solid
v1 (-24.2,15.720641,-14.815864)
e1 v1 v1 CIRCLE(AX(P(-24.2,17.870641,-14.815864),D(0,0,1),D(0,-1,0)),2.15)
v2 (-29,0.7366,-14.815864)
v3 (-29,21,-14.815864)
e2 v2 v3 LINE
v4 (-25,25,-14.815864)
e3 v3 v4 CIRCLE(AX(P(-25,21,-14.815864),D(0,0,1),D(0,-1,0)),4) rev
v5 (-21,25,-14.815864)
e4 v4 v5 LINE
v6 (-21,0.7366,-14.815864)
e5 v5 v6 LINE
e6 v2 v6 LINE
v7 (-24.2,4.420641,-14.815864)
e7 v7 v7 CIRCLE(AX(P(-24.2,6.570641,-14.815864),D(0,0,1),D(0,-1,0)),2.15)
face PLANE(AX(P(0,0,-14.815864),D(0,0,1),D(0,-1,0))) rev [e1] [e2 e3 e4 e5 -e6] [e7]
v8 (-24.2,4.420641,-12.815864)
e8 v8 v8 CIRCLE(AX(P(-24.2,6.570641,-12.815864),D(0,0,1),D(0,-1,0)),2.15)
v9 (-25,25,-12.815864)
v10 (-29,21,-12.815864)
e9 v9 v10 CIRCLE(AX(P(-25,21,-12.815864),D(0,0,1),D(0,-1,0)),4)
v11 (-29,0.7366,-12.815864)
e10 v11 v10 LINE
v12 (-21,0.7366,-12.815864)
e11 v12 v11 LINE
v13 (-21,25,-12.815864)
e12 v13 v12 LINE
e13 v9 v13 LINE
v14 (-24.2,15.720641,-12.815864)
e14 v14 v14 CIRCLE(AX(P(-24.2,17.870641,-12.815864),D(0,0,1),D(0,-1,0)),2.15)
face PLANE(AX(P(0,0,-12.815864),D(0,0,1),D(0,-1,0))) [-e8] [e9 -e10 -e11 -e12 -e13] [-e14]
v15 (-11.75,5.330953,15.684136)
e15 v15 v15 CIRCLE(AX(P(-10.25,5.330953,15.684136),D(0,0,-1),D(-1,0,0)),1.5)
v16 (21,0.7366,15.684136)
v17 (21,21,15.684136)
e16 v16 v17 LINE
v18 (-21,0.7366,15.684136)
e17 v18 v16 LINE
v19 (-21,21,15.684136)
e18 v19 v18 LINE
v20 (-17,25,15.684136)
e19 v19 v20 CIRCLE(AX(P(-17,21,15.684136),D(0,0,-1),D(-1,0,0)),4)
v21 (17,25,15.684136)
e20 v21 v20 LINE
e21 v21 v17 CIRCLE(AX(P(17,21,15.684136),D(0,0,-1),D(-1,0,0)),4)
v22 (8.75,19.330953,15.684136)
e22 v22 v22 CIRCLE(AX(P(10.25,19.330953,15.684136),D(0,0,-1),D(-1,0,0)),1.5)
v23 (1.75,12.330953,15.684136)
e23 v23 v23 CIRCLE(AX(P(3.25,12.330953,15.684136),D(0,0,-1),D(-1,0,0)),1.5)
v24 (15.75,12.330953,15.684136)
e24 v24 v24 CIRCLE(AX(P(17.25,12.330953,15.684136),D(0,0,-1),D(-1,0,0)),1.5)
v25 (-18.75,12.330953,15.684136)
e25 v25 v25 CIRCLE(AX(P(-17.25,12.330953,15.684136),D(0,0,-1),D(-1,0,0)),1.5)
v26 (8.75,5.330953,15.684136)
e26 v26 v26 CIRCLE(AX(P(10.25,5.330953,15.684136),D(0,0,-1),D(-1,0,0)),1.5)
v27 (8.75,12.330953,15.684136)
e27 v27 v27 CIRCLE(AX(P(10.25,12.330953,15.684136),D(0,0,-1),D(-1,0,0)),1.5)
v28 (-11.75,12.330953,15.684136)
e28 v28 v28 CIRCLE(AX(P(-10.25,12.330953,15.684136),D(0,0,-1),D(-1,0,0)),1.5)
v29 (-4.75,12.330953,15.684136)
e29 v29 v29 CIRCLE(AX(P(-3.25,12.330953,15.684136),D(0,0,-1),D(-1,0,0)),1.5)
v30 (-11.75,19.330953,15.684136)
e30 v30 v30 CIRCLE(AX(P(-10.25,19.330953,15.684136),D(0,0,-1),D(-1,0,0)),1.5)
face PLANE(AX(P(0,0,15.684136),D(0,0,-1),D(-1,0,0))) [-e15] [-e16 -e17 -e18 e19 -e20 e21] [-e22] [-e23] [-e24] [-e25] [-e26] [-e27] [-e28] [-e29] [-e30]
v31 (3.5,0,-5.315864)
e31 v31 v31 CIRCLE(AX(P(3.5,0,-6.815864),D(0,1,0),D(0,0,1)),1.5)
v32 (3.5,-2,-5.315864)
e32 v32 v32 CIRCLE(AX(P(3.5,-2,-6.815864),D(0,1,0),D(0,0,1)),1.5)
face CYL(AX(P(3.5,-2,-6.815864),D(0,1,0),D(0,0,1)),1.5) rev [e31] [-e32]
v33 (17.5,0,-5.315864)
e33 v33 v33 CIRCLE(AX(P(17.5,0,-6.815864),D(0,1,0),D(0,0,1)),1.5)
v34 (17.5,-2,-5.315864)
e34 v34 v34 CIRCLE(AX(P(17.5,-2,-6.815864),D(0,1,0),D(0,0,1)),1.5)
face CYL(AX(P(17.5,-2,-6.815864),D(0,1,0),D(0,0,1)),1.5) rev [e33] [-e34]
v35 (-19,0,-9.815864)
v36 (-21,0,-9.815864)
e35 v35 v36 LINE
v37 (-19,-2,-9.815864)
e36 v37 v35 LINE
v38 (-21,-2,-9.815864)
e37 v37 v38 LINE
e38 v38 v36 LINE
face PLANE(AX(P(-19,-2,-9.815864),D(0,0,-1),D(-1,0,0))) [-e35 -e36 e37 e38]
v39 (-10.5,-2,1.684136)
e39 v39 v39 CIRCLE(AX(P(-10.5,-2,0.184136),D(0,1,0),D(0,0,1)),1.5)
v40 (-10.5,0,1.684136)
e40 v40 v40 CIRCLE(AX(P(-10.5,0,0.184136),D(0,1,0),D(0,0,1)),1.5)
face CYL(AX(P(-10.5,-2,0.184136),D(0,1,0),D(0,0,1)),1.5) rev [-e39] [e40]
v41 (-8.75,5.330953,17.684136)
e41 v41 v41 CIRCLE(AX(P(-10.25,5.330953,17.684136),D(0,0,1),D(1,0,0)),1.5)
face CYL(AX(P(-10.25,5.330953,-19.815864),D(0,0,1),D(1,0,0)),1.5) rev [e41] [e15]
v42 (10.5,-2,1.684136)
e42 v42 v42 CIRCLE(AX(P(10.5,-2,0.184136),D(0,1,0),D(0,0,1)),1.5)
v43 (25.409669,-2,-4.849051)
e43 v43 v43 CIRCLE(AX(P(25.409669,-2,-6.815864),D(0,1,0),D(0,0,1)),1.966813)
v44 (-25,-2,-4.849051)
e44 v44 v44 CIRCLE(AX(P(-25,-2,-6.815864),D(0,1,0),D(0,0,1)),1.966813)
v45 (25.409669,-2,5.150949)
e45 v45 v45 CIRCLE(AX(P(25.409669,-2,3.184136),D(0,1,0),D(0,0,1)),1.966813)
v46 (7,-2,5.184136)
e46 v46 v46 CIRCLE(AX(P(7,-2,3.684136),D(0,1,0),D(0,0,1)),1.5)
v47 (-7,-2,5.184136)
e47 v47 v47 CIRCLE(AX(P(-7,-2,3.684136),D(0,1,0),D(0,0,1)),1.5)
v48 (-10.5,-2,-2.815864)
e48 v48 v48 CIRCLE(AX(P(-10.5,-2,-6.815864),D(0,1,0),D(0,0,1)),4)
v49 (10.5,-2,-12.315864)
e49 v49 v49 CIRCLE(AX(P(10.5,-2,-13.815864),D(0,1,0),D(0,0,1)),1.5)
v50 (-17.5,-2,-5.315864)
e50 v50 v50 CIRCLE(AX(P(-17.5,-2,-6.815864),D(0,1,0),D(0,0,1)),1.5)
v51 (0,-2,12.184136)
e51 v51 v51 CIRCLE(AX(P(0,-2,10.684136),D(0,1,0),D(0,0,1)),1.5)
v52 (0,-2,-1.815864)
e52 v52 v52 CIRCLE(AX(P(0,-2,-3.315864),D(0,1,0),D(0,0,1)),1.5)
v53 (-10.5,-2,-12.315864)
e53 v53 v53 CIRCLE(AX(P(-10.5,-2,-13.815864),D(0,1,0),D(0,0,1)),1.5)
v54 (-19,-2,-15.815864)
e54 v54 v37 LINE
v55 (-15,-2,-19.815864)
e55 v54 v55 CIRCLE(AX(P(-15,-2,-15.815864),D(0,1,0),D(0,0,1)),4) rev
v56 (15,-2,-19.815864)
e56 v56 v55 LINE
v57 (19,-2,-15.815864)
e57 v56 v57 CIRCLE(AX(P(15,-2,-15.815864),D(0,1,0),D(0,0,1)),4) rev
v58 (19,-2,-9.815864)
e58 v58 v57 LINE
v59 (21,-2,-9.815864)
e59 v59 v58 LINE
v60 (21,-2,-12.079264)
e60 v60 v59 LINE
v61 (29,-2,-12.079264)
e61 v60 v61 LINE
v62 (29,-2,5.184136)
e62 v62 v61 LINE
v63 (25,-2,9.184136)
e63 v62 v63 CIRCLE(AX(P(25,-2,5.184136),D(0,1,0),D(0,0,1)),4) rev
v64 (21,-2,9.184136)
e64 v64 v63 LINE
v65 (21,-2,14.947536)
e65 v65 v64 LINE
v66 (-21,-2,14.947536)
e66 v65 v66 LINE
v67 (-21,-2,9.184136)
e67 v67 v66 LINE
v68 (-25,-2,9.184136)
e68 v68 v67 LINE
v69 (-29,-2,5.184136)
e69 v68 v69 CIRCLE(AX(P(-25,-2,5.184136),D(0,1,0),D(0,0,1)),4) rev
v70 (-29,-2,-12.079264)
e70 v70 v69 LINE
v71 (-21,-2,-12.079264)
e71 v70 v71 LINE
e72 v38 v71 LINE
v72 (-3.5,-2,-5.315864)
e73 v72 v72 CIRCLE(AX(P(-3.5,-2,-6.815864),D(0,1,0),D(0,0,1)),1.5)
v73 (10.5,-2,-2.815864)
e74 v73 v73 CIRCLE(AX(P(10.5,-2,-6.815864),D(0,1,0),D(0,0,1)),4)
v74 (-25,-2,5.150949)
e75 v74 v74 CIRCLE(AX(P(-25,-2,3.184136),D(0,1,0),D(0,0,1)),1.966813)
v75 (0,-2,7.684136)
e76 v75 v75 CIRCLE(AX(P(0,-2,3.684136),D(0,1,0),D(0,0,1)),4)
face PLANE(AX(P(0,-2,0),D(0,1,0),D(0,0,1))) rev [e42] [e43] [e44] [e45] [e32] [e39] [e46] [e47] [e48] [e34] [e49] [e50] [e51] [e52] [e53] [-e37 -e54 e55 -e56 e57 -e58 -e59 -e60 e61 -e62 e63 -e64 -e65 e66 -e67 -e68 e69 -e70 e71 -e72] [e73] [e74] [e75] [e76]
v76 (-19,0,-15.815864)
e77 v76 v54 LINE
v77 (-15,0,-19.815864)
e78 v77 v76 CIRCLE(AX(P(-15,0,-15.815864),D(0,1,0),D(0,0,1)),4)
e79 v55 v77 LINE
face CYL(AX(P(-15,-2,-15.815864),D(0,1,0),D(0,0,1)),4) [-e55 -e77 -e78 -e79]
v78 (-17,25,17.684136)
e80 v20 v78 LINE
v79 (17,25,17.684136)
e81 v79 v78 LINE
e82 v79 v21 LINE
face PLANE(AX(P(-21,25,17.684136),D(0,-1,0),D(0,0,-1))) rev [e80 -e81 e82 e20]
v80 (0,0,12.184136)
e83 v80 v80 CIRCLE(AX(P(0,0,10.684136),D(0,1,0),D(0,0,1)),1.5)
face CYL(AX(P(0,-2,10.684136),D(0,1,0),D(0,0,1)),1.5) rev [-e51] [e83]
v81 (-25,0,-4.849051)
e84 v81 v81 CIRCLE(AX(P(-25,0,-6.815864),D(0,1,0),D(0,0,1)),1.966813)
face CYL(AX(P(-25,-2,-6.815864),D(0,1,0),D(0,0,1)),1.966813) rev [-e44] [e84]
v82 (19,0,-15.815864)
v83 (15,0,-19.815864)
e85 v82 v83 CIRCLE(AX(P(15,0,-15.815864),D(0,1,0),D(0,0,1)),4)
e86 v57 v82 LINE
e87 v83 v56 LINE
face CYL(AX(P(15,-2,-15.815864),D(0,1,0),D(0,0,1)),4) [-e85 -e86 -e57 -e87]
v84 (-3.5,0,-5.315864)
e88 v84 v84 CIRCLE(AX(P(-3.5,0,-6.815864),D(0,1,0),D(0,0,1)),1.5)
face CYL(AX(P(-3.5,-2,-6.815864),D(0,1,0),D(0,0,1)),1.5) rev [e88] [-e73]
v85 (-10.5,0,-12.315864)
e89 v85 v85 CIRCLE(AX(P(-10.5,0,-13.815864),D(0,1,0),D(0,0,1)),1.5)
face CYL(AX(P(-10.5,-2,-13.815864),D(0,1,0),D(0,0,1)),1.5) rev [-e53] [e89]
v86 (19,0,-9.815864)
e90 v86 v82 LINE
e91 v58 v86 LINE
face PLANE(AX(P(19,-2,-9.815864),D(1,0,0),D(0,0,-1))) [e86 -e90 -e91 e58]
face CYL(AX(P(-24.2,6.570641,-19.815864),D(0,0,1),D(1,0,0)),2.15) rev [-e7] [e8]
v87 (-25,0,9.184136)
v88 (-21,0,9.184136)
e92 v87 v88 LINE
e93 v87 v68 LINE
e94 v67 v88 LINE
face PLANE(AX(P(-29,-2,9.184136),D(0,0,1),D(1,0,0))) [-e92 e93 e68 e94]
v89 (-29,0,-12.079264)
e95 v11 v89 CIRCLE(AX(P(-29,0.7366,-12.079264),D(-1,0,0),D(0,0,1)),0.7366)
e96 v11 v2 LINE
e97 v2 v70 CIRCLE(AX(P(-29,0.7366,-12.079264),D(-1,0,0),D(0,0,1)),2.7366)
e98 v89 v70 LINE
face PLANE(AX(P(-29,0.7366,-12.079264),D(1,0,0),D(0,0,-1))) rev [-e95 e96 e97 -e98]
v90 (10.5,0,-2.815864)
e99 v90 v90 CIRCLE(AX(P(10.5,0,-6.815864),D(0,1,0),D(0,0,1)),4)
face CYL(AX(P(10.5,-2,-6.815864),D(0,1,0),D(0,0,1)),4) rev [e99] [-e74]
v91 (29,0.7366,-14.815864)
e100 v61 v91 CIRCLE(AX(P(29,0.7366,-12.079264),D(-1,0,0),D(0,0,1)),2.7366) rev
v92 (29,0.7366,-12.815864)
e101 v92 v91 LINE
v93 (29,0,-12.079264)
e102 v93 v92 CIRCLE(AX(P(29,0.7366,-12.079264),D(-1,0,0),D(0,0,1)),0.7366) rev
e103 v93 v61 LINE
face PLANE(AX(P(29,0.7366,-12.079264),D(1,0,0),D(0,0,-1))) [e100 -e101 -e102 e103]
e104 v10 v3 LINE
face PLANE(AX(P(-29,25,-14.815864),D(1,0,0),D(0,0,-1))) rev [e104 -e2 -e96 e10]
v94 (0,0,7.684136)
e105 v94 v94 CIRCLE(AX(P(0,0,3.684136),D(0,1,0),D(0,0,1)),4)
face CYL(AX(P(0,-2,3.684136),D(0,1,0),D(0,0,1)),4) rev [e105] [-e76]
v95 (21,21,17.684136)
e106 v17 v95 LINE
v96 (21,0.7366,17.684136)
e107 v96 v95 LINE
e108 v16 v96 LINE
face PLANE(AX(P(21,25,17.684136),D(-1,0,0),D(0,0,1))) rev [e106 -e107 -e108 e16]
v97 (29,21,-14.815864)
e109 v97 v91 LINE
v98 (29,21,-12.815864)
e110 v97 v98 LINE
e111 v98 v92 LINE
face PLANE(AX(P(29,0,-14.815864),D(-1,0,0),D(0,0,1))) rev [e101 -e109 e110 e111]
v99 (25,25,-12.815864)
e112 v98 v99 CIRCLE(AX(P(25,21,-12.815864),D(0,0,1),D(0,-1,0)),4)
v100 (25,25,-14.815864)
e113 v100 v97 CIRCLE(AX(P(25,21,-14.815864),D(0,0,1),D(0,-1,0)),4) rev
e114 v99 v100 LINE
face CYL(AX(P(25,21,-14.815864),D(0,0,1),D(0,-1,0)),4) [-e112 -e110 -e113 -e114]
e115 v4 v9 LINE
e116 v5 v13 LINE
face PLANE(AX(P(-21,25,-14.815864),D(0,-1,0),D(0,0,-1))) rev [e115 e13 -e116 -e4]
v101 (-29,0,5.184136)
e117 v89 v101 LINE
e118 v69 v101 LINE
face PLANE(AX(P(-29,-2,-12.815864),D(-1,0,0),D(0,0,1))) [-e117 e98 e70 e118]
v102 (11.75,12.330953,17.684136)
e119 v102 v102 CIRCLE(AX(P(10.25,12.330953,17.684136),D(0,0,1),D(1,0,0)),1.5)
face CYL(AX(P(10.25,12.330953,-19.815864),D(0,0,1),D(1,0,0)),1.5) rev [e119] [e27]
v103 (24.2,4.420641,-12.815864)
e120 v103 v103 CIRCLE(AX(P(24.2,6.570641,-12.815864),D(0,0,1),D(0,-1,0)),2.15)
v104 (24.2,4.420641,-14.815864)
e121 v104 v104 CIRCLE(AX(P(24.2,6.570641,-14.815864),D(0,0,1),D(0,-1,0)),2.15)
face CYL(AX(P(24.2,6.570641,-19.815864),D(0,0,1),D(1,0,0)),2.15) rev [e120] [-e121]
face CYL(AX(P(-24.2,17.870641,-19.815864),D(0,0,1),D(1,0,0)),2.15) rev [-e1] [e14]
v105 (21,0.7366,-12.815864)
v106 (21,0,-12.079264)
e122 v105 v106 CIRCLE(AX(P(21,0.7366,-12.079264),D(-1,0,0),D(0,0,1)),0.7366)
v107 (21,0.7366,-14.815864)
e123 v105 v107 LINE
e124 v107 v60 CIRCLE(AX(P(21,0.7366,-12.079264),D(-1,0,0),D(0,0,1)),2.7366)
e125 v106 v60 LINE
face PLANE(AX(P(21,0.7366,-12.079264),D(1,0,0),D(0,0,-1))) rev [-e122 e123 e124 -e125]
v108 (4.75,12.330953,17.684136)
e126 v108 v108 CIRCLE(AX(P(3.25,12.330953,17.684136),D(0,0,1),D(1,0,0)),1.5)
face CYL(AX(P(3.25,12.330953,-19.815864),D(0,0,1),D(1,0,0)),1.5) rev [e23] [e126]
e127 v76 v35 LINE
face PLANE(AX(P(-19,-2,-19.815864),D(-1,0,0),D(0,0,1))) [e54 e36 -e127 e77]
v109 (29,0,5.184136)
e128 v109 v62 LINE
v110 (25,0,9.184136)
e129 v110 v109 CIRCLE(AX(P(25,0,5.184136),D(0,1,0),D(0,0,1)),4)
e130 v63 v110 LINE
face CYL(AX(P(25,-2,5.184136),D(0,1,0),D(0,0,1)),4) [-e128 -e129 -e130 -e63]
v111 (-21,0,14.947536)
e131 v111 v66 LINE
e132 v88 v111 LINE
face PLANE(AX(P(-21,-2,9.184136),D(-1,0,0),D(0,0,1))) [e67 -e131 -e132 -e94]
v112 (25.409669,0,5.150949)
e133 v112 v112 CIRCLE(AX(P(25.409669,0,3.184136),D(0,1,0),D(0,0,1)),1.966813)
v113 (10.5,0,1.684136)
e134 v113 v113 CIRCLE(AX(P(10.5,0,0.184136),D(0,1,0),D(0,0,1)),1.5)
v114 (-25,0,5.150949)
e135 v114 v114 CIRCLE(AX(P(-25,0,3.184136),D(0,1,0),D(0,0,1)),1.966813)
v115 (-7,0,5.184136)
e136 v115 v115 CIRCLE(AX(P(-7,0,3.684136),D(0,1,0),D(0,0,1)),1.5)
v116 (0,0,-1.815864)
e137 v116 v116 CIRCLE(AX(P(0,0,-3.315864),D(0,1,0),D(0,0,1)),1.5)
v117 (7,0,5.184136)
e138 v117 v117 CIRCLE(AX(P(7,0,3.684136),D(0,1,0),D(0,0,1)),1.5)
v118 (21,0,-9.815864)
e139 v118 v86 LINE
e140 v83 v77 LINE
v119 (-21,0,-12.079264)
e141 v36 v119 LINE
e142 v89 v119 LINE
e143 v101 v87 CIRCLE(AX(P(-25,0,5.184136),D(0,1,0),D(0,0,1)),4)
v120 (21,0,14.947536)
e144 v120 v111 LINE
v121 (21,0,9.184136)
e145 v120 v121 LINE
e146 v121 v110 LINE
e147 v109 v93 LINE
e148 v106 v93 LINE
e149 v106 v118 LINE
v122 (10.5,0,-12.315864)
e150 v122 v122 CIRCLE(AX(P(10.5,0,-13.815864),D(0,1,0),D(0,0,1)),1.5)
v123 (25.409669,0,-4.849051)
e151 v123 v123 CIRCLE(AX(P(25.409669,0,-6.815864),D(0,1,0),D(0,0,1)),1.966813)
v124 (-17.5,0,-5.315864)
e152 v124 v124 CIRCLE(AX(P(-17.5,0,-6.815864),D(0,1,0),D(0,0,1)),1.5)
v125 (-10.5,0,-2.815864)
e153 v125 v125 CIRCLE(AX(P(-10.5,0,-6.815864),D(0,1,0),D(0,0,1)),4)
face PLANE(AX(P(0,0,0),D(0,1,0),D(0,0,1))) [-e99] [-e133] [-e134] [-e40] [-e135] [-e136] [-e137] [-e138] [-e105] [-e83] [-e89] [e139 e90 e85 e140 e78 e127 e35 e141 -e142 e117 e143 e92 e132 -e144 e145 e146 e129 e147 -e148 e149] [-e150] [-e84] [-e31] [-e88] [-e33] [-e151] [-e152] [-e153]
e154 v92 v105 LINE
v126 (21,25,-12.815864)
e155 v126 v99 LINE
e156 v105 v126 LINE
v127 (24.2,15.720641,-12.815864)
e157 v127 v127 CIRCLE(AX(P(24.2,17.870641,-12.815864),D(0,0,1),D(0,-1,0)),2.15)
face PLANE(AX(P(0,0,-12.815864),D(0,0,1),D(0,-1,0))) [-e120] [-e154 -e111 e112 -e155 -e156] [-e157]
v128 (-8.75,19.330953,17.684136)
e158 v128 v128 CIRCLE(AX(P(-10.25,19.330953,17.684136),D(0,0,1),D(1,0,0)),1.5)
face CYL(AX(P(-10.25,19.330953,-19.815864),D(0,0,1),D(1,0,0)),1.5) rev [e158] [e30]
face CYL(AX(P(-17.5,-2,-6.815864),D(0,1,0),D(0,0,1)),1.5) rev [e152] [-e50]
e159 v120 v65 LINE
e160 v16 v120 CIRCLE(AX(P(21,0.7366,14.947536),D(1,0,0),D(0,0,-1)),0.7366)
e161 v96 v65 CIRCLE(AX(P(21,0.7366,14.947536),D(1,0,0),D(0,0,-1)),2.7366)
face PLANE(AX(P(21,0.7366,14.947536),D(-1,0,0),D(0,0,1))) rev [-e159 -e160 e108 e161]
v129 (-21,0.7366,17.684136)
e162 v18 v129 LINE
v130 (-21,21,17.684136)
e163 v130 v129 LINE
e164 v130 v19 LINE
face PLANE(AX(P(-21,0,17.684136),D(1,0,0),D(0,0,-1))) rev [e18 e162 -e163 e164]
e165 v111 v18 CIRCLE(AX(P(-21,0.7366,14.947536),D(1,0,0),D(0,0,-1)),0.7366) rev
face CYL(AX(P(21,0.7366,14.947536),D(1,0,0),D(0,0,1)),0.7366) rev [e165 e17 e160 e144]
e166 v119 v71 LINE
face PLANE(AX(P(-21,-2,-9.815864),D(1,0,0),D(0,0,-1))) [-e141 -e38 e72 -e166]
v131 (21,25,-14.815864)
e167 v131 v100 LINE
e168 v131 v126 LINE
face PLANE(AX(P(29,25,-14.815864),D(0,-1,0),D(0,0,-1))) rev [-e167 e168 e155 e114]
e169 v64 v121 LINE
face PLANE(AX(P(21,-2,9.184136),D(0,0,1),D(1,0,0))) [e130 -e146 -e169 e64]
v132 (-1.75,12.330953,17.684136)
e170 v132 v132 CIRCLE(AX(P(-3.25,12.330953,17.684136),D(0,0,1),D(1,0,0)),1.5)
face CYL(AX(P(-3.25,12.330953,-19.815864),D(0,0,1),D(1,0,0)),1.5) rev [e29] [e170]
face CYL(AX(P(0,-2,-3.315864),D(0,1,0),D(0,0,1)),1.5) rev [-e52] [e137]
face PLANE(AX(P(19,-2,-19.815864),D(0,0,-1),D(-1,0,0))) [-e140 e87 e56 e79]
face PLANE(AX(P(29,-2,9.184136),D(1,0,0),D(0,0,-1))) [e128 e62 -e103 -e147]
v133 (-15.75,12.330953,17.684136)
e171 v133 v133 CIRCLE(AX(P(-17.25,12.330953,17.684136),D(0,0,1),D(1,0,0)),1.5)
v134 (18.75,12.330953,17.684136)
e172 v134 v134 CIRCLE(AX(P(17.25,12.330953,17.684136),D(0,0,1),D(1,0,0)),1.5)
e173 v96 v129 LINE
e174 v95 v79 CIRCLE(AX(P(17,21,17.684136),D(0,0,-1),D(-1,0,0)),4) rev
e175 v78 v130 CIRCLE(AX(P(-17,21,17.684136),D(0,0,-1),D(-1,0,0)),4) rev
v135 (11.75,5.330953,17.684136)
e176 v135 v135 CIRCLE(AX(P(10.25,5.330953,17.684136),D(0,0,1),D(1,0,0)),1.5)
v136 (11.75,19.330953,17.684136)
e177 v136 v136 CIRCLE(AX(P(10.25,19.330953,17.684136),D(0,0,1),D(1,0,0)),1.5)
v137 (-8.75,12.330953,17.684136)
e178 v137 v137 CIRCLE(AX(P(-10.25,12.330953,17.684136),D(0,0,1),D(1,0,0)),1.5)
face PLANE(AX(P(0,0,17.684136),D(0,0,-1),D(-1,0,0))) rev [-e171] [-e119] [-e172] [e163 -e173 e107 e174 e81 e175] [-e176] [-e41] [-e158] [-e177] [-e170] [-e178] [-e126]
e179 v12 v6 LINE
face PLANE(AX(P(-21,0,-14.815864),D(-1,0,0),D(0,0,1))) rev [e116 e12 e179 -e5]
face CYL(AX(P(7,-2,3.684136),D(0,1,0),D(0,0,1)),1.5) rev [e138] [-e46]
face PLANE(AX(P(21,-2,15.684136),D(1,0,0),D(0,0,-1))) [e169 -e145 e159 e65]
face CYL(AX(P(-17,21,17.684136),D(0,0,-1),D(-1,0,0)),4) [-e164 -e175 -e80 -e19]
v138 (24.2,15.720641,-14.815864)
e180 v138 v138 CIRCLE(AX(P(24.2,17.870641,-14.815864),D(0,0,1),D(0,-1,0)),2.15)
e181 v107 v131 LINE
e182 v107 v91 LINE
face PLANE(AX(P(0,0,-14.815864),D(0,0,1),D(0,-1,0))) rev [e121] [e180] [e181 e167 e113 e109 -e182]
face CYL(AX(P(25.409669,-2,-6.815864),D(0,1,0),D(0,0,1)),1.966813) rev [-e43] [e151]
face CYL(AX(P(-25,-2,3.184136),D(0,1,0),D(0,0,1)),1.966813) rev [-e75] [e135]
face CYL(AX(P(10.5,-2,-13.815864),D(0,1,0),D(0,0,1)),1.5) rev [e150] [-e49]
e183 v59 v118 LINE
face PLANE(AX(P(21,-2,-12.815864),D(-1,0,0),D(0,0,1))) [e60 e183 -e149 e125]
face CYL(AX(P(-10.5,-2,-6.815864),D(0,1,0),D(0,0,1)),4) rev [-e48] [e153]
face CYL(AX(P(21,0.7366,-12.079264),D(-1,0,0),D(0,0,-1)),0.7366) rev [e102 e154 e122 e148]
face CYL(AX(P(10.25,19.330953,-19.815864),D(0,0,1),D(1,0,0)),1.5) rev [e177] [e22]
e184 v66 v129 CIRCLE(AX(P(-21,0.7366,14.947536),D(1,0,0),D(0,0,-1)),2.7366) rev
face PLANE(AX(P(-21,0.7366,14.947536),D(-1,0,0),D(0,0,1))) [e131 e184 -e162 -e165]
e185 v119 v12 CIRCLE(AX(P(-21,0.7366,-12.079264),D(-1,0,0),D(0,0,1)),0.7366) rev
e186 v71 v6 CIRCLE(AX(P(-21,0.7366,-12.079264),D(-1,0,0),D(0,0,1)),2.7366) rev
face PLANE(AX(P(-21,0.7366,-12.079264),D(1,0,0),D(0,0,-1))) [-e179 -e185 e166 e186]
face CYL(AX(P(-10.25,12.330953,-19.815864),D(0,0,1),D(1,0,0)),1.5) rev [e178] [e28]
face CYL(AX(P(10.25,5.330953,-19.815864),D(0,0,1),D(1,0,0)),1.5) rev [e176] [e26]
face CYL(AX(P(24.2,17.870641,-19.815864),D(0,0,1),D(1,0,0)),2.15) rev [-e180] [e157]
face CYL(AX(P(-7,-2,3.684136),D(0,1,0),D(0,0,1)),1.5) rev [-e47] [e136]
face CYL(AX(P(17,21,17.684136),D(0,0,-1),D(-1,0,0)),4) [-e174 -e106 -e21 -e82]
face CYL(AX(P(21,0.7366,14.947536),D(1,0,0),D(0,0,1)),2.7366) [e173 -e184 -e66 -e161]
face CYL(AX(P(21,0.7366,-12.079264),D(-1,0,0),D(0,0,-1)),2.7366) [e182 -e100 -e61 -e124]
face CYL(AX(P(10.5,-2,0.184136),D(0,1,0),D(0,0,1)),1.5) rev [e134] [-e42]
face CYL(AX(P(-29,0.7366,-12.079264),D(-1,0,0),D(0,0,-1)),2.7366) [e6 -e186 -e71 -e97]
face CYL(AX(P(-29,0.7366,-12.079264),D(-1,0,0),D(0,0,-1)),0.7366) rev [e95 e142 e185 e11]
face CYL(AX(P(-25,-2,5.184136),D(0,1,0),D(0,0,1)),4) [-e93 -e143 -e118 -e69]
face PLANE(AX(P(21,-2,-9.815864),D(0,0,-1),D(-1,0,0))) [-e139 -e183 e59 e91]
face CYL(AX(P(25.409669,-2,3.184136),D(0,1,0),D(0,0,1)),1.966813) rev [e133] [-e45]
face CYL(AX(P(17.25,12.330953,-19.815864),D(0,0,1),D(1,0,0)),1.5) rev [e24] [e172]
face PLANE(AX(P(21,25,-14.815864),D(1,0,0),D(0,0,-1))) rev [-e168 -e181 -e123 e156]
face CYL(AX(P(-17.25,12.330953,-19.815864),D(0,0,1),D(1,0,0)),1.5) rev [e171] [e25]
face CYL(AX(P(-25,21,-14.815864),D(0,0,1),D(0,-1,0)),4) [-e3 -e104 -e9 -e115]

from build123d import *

# Parameters (mm, degrees)
SKETCH2_R                    = 1.9668129
SKETCH2_R_2                  = 4
SKETCH2_R_3                  = 1.5
BASE_FLANGE1_DEPTH           = 2
FILLET1_R                    = 4
EDGE_FLANGE1_STRIP_W         = 9.4732
EDGE_FLANGE1_STRIP_H         = 2
EDGE_FLANGE1_STRIP_CUT_DEPTH = 8
EDGE_FLANGE1_DEPTH           = 8
EDGE_FLANGE2_STRIP_W         = 9.4732
EDGE_FLANGE2_STRIP_H         = 2
EDGE_FLANGE2_STRIP_CUT_DEPTH = 8
EDGE_FLANGE2_DEPTH           = 8
EDGE_FLANGE3_STRIP_W         = 9.4732
EDGE_FLANGE3_STRIP_H         = 2
EDGE_FLANGE3_STRIP_CUT_DEPTH = 42
EDGE_FLANGE3_DEPTH           = 42
FILLET2_R                    = 4
FILLET3_R                    = 4
SKETCH16_R                   = 2.15
SKETCH16_R_2                 = 1.5
CUT_EXTRUDE1_DEPTH           = 54.593376456


# Sheet-metal steps are written as plain solids
with BuildPart() as part:
    # Sketch2 → Base-Flange1 (new body)
    with BuildSketch(Plane(origin=(0, 0, 0), x_dir=(1, 0, 0), z_dir=(0, 1, 0))):
        Polygon((-21, 12.815864023), (-29, 12.815864023), (-29, -9.184135977), (-21, -9.184135977), (-21, -15.684135977), (21, -15.684135977), (21, -9.184135977), (29, -9.184135977), (29, 12.815864023), (21, 12.815864023), (21, 9.815864023), (19, 9.815864023), (19, 19.815864023), (-19, 19.815864023), (-19, 9.815864023), (-21, 9.815864023), align=None)
        with Locations(Location((-25, -3.184135977, 0), (0, 0, 270))):
            Circle(SKETCH2_R, mode=Mode.SUBTRACT)
        with Locations(Location((-25, 6.815864023, 0), (0, 0, 270))):
            Circle(SKETCH2_R, mode=Mode.SUBTRACT)
        with Locations(Location((25.409668555, 6.815864023, 0), (0, 0, 270))):
            Circle(SKETCH2_R, mode=Mode.SUBTRACT)
        with Locations(Location((25.409668555, -3.184135977, 0), (0, 0, 270))):
            Circle(SKETCH2_R, mode=Mode.SUBTRACT)
        with Locations(Location((-10.5, 6.815864023, 0), (0, 0, 270))):
            Circle(SKETCH2_R_2, mode=Mode.SUBTRACT)
        with Locations(Location((10.5, 6.815864023, 0), (0, 0, 270))):
            Circle(SKETCH2_R_2, mode=Mode.SUBTRACT)
        with Locations(Location((0, -3.684135977, 0), (0, 0, 270))):
            Circle(SKETCH2_R_2, mode=Mode.SUBTRACT)
        with Locations(Location((-10.5, 13.815864023, 0), (0, 0, 270))):
            Circle(SKETCH2_R_3, mode=Mode.SUBTRACT)
        with Locations(Location((10.5, 13.815864023, 0), (0, 0, 270))):
            Circle(SKETCH2_R_3, mode=Mode.SUBTRACT)
        with Locations(Location((0, -10.684135977, 0), (0, 0, 270))):
            Circle(SKETCH2_R_3, mode=Mode.SUBTRACT)
        with Locations(Location((-3.5, 6.815864023, 0), (0, 0, 270))):
            Circle(SKETCH2_R_3, mode=Mode.SUBTRACT)
        with Locations(Location((-10.5, -0.184135977, 0), (0, 0, 270))):
            Circle(SKETCH2_R_3, mode=Mode.SUBTRACT)
        with Locations(Location((-17.5, 6.815864023, 0), (0, 0, 270))):
            Circle(SKETCH2_R_3, mode=Mode.SUBTRACT)
        with Locations(Location((17.5, 6.815864023, 0), (0, 0, 270))):
            Circle(SKETCH2_R_3, mode=Mode.SUBTRACT)
        with Locations(Location((10.5, -0.184135977, 0), (0, 0, 270))):
            Circle(SKETCH2_R_3, mode=Mode.SUBTRACT)
        with Locations(Location((3.5, 6.815864023, 0), (0, 0, 270))):
            Circle(SKETCH2_R_3, mode=Mode.SUBTRACT)
        with Locations(Location((-7, -3.684135977, 0), (0, 0, 270))):
            Circle(SKETCH2_R_3, mode=Mode.SUBTRACT)
        with Locations(Location((0, 3.315864023, 0), (0, 0, 270))):
            Circle(SKETCH2_R_3, mode=Mode.SUBTRACT)
        with Locations(Location((7, -3.684135977, 0), (0, 0, 270))):
            Circle(SKETCH2_R_3, mode=Mode.SUBTRACT)
    extrude(amount=-BASE_FLANGE1_DEPTH)

    # Fillet1
    fillet1_edges = [part.edges().sort_by_distance(p)[0] for p in [
        (-19, -1, -19.815864023),
        (19, -1, -19.815864023),
        (29, -1, 9.184135977),
        (-29, -1, 9.184135977),
    ]]
    fillet(fillet1_edges, radius=FILLET1_R)

    # Edge-Flange1 strip (across the edge) → Edge-Flange1 strip cut (cut)
    with BuildSketch(Plane(origin=(-21, 0, -12.815864023), x_dir=(0, 0, 1), z_dir=(-1, 0, 0))):
        with Locations((-4, -1)):
            Rectangle(EDGE_FLANGE1_STRIP_W, EDGE_FLANGE1_STRIP_H)
    extrude(amount=EDGE_FLANGE1_STRIP_CUT_DEPTH, mode=Mode.SUBTRACT)

    # Edge-Flange1 section (across the edge) → Edge-Flange1 (add)
    with BuildSketch(Plane(origin=(-21, 0, -12.815864023), x_dir=(0, 0, 1), z_dir=(-1, 0, 0))):
        with BuildLine():
            Line((-2, 0.7366), (-2, 25))
            Line((-2, 25), (0, 25))
            Line((0, 25), (0, 0.7366))
            ThreePointArc((0, 0.7366), (0.215745145, 0.215745145), (0.7366, 0))
            Line((0.7366, 0), (0.7366, -2))
            ThreePointArc((0.7366, -2), (-1.198468417, -1.198468417), (-2, 0.7366))
        make_face()
    extrude(amount=EDGE_FLANGE1_DEPTH)

    # Edge-Flange2 strip (across the edge) → Edge-Flange2 strip cut (cut)
    with BuildSketch(Plane(origin=(29, 0, -12.815864023), x_dir=(0, 0, 1), z_dir=(-1, 0, 0))):
        with Locations((-4, -1)):
            Rectangle(EDGE_FLANGE2_STRIP_W, EDGE_FLANGE2_STRIP_H)
    extrude(amount=EDGE_FLANGE2_STRIP_CUT_DEPTH, mode=Mode.SUBTRACT)

    # Edge-Flange2 section (across the edge) → Edge-Flange2 (add)
    with BuildSketch(Plane(origin=(29, 0, -12.815864023), x_dir=(0, 0, 1), z_dir=(-1, 0, 0))):
        with BuildLine():
            Line((-2, 0.7366), (-2, 25))
            Line((-2, 25), (0, 25))
            Line((0, 25), (0, 0.7366))
            ThreePointArc((0, 0.7366), (0.215745145, 0.215745145), (0.7366, 0))
            Line((0.7366, 0), (0.7366, -2))
            ThreePointArc((0.7366, -2), (-1.198468417, -1.198468417), (-2, 0.7366))
        make_face()
    extrude(amount=EDGE_FLANGE2_DEPTH)

    # Edge-Flange3 strip (across the edge) → Edge-Flange3 strip cut (cut)
    with BuildSketch(Plane(origin=(-21, 0, 15.684135977), x_dir=(0, 0, -1), z_dir=(1, 0, 0))):
        with Locations((-4, -1)):
            Rectangle(EDGE_FLANGE3_STRIP_W, EDGE_FLANGE3_STRIP_H)
    extrude(amount=EDGE_FLANGE3_STRIP_CUT_DEPTH, mode=Mode.SUBTRACT)

    # Edge-Flange3 section (across the edge) → Edge-Flange3 (add)
    with BuildSketch(Plane(origin=(-21, 0, 15.684135977), x_dir=(0, 0, -1), z_dir=(1, 0, 0))):
        with BuildLine():
            Line((-2, 0.7366), (-2, 25))
            Line((-2, 25), (0, 25))
            Line((0, 25), (0, 0.7366))
            ThreePointArc((0, 0.7366), (0.215745145, 0.215745145), (0.7366, 0))
            Line((0.7366, 0), (0.7366, -2))
            ThreePointArc((0.7366, -2), (-1.198468417, -1.198468417), (-2, 0.7366))
        make_face()
    extrude(amount=EDGE_FLANGE3_DEPTH)

    # Fillet2
    fillet2_edges = [part.edges().sort_by_distance(p)[0] for p in [
        (-29, 25, -13.815864023),
        (29, 25, -13.815864023),
    ]]
    fillet(fillet2_edges, radius=FILLET2_R)

    # Fillet3
    fillet3_edges = [part.edges().sort_by_distance(p)[0] for p in [
        (-21, 25, 16.684135977),
        (21, 25, 16.684135977),
    ]]
    fillet(fillet3_edges, radius=FILLET3_R)

    # Sketch16 → Cut-Extrude1 (cut, through all)
    with BuildSketch(Plane.XY.offset(17.684135977)):
        with Locations(Location((-24.2, 17.870640786, 0), (0, 0, 270))):
            Circle(SKETCH16_R)
        with Locations(Location((24.2, 17.870640786, 0), (0, 0, 270))):
            Circle(SKETCH16_R)
        with Locations(Location((-24.2, 6.570640786, 0), (0, 0, 270))):
            Circle(SKETCH16_R)
        with Locations(Location((24.2, 6.570640786, 0), (0, 0, 270))):
            Circle(SKETCH16_R)
        with Locations((-10.25, 12.330953146)):
            Circle(SKETCH16_R_2)
        with Locations((-10.25, 5.330953146)):
            Circle(SKETCH16_R_2)
        with Locations((10.25, 12.330953146)):
            Circle(SKETCH16_R_2)
        with Locations((10.25, 5.330953146)):
            Circle(SKETCH16_R_2)
        with Locations((-17.25, 12.330953146)):
            Circle(SKETCH16_R_2)
        with Locations((-10.25, 19.330953146)):
            Circle(SKETCH16_R_2)
        with Locations((-3.25, 12.330953146)):
            Circle(SKETCH16_R_2)
        with Locations((3.25, 12.330953146)):
            Circle(SKETCH16_R_2)
        with Locations((10.25, 19.330953146)):
            Circle(SKETCH16_R_2)
        with Locations((17.25, 12.330953146)):
            Circle(SKETCH16_R_2)
    extrude(amount=-CUT_EXTRUDE1_DEPTH, mode=Mode.SUBTRACT)


solid = part.part
